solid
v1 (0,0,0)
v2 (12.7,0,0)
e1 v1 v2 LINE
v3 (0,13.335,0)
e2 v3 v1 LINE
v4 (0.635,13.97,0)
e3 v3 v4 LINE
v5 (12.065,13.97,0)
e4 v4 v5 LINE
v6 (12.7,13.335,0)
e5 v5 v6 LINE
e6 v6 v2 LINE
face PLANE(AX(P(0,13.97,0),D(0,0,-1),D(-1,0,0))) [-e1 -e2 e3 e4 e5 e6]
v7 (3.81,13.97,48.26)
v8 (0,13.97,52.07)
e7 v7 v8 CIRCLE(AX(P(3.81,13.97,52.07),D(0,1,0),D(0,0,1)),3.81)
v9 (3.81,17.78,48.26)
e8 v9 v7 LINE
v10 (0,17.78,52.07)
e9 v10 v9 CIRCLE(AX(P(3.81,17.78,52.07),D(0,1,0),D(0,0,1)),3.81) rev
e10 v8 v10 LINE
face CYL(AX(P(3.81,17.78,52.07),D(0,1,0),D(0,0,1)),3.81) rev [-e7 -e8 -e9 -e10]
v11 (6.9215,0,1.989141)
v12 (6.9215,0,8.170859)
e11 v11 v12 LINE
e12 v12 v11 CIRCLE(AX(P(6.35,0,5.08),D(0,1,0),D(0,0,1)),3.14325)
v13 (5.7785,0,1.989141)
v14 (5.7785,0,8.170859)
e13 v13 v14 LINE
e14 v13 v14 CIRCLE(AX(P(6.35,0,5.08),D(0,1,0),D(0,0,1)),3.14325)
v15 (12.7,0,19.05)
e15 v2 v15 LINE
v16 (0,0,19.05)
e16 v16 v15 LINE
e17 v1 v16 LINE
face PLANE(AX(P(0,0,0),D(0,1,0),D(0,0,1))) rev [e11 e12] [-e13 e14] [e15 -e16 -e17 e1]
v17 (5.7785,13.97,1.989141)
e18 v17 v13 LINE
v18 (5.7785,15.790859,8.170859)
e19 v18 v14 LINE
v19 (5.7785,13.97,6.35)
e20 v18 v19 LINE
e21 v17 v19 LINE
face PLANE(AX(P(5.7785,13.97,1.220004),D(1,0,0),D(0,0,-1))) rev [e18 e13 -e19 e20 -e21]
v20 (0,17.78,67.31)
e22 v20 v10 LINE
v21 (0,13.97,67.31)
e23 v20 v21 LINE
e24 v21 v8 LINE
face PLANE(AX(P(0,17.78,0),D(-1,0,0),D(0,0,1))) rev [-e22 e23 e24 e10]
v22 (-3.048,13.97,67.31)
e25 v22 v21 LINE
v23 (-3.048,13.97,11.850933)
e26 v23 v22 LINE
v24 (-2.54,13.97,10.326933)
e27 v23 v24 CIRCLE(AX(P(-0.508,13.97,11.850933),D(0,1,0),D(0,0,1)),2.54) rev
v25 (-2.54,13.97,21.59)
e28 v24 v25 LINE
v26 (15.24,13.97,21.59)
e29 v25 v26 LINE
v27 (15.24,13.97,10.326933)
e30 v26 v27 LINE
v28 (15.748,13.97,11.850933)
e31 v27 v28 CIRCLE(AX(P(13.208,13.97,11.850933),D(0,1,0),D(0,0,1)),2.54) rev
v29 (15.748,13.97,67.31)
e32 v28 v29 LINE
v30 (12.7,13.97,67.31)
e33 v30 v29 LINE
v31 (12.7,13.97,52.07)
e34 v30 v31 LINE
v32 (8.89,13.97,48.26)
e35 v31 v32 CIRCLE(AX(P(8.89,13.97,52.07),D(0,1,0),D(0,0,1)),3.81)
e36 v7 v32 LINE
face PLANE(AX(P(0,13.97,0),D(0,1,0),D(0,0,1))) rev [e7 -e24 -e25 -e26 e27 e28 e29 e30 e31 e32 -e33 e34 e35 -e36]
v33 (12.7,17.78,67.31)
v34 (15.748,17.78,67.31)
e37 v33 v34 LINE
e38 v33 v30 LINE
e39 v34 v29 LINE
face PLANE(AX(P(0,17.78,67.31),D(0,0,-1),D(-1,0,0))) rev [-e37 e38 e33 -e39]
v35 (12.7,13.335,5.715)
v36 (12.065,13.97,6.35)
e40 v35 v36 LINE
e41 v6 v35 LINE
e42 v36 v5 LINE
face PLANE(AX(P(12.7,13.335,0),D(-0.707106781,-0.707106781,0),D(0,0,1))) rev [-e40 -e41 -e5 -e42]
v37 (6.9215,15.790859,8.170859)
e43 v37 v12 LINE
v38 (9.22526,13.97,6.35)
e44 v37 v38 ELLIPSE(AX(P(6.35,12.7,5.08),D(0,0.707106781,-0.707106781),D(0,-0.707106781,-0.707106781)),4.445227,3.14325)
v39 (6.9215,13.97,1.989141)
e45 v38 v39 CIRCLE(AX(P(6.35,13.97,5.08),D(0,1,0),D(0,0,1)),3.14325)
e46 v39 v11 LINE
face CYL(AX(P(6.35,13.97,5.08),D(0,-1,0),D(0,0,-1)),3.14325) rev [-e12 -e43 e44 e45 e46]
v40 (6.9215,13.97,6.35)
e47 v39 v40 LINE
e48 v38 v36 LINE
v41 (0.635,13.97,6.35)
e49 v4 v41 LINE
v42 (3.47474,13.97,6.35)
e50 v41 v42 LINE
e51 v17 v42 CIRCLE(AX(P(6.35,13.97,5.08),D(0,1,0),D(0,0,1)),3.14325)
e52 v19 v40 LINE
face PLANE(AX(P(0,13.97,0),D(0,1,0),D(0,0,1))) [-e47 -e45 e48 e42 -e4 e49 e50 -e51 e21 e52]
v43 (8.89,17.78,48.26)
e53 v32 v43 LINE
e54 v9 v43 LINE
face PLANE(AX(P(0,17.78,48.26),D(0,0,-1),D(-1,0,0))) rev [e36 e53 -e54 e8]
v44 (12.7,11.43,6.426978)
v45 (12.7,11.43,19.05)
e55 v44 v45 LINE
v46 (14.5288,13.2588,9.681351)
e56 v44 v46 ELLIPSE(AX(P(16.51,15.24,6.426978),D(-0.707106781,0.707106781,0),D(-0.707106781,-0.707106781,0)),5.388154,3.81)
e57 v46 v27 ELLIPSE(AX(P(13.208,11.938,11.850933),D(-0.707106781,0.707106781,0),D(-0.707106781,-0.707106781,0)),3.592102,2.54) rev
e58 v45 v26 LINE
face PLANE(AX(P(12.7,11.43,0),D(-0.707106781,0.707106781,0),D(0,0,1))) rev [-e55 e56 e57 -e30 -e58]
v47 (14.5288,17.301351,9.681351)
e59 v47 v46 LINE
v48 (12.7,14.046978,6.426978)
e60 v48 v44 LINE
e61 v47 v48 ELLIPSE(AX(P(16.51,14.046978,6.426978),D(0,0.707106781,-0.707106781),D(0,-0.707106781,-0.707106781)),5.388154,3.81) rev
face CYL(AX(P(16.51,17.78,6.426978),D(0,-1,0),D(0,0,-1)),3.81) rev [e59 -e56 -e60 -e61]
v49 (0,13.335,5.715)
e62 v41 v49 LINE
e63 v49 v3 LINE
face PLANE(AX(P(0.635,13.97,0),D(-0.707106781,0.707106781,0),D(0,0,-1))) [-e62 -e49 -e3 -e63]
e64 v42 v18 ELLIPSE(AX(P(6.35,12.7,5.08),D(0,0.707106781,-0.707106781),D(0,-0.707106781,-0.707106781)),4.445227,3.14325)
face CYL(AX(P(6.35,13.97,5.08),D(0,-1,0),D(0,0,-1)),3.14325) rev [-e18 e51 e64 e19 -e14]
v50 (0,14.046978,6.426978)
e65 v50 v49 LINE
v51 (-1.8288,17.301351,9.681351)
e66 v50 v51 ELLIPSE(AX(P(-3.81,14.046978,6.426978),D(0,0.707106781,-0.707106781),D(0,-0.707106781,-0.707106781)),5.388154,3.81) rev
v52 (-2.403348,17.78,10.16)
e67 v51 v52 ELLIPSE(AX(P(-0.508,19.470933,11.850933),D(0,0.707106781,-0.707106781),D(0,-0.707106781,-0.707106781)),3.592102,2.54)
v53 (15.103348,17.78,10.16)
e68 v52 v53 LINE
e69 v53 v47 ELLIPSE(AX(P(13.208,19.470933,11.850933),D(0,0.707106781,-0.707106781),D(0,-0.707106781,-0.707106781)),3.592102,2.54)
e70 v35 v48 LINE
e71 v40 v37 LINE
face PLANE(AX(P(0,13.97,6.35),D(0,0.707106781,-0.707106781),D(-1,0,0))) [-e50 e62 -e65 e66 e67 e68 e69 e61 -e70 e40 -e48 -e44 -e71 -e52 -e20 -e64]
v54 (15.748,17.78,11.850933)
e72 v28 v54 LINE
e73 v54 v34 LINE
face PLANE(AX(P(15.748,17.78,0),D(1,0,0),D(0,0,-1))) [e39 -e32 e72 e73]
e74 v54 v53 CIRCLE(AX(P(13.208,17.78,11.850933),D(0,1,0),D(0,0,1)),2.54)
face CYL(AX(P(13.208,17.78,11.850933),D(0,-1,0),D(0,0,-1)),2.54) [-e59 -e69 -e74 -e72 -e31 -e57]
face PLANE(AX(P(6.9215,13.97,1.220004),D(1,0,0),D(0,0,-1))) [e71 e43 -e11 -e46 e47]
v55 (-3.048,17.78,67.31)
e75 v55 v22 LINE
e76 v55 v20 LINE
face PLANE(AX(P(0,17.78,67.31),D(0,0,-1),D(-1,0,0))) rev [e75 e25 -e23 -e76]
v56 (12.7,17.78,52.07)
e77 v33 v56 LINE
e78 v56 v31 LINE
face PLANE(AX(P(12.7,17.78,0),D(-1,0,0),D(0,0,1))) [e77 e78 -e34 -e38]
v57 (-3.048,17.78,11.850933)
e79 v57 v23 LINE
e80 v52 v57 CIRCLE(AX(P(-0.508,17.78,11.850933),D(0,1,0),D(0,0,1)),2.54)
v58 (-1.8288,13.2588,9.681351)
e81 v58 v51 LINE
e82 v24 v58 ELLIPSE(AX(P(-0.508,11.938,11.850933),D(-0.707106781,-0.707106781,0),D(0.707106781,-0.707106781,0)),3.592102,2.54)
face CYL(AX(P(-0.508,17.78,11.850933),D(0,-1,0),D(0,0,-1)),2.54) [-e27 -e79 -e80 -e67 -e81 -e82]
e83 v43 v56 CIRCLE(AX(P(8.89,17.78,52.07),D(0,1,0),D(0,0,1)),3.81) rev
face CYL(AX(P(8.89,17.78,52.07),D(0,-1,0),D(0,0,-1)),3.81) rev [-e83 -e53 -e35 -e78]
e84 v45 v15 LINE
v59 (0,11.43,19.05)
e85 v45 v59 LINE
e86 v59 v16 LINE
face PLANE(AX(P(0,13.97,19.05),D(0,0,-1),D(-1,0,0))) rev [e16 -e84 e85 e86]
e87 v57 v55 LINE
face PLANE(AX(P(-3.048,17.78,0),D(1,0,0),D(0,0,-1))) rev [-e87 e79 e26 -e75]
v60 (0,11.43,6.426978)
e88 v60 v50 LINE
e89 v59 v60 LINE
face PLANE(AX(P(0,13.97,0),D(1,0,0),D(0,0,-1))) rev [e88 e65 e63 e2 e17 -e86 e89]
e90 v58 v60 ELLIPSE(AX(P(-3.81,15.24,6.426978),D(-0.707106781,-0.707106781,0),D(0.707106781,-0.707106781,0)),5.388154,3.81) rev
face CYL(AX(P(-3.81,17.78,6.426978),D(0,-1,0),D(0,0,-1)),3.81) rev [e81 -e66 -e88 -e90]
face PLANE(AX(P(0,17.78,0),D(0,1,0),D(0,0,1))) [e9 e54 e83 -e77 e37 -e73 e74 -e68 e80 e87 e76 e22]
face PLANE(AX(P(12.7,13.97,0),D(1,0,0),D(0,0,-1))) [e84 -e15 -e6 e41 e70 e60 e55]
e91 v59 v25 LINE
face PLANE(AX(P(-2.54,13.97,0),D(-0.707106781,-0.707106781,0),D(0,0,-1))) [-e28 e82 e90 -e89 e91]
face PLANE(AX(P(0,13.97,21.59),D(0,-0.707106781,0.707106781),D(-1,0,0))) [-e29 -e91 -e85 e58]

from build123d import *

# Parameters (mm, degrees)
SKETCH1_W           = 12.7
SKETCH1_H           = 19.05
BOSS_EXTRUDE1_DEPTH = 13.97
SKETCH2_W           = 12.7
SKETCH2_H           = 8.89
BOSS_EXTRUDE2_DEPTH = 3.81
CHAMFER3_SIZE       = 3.81
CHAMFER5_SIZE       = 2.54
FILLET1_R           = 3.81
FILLET2_R           = 3.81
FILLET3_R           = 2.54
CHAMFER6_SIZE       = 0.635


with BuildPart() as part:
    # Sketch1 → Boss-Extrude1 (new body)
    with BuildSketch(Plane(origin=(0, 0, 0), x_dir=(1, 0, 0), z_dir=(0, 1, 0))):
        with Locations((6.35, -9.525)):
            Rectangle(SKETCH1_W, SKETCH1_H)
        with BuildLine():
            Line((5.7785, -1.989141169), (5.7785, -8.170858831))
            ThreePointArc((5.7785, -8.170858831), (3.20675, -5.08), (5.7785, -1.989141169))
        make_face(mode=Mode.SUBTRACT)
        with BuildLine():
            ThreePointArc((6.9215, -1.989141169), (9.49325, -5.08), (6.9215, -8.170858831))
            Line((6.9215, -8.170858831), (6.9215, -1.989141169))
        make_face(mode=Mode.SUBTRACT)
    extrude(amount=BOSS_EXTRUDE1_DEPTH)

    # Sketch2 → Boss-Extrude2 (add)
    with BuildSketch(Plane(origin=(0, 13.97, 0), x_dir=(1, 0, 0), z_dir=(0, 1, 0))):
        Polygon((0, -10.16), (-3.048, -10.16), (-3.048, -67.31), (0, -67.31), (0, -48.26), (12.7, -48.26), (12.7, -67.31), (15.748, -67.31), (15.748, -10.16), (12.7, -10.16), (12.7, -19.05), (0, -19.05), align=None)
        with Locations((6.35, -14.605)):
            Rectangle(SKETCH2_W, SKETCH2_H)
    extrude(amount=BOSS_EXTRUDE2_DEPTH)

    # Chamfer3
    # the kernel refuses this chamfer: 3.81 mm, written as the material it adds along each edge
    with BuildSketch(Plane(origin=(12.7, 13.97, 10.16), x_dir=(0, -0.027495876610586382, -0.9996219169112968), z_dir=(-1, 0, 0))) as chamfer3_piece_1_section:
        Polygon((CHAMFER3_SIZE * 0.999621916911, -CHAMFER3_SIZE * 0.0274958766106), (-CHAMFER3_SIZE * 0.0274958766106, -CHAMFER3_SIZE * 0.999621916911), (0, 0), align=None)
    chamfer3_piece_1 = extrude(amount=12.7, mode=Mode.PRIVATE)
    chamfer3_piece_1 = chamfer3_piece_1 - Plane(origin=(6.35, 15.278434863, 5.08), x_dir=(-0.18181818181819312, 0, 0.9833321660356314), z_dir=(0, -1, 0)) * Cylinder(3.14325, 41, mode=Mode.PRIVATE)
    add(chamfer3_piece_1)
    with BuildSketch(Plane(origin=(22.498112184, 13.97, 10.16), x_dir=(0, -0.027495876610586382, -0.9996219169112968), z_dir=(-1, 0, 0))) as chamfer3_piece_2_section:
        Polygon((CHAMFER3_SIZE * 0.999621916911, -CHAMFER3_SIZE * 0.0274958766106), (-CHAMFER3_SIZE * 0.0274958766106, -CHAMFER3_SIZE * 0.999621916911), (0, 0), align=None)
    chamfer3_piece_2 = extrude(amount=32.296224368, mode=Mode.PRIVATE)
    chamfer3_piece_2 = split(chamfer3_piece_2, bisect_by=Plane(origin=(5.7785, 14.588702158, 7.587404322), z_dir=(1, 0, 0)), keep=Keep.TOP, mode=Mode.PRIVATE)
    chamfer3_piece_2 = split(chamfer3_piece_2, bisect_by=Plane(origin=(6.9215, 14.588702158, 7.587404322), z_dir=(-1, 0, 0)), keep=Keep.TOP, mode=Mode.PRIVATE)
    add(chamfer3_piece_2)

    # Chamfer5
    chamfer5_edges = [part.edges().sort_by_distance(p)[0] for p in [
        (6.35, 13.97, 19.05),
        (12.7, 13.97, 14.605),
        (0, 13.97, 14.605),
    ]]
    chamfer(chamfer5_edges, length=CHAMFER5_SIZE)

    # Fillet1
    fillet1_edges = [part.edges().sort_by_distance(p)[0] for p in [
        (0, 15.875, 48.26),
        (12.7, 15.875, 48.26),
    ]]
    fillet(fillet1_edges, radius=FILLET1_R)

    # Fillet2
    # the kernel refuses this fillet: 3.81 mm, written as the material it adds along each edge
    with BuildSketch(Plane(origin=(0, 2.09744408, 10.16), x_dir=(-1.0, 0, -1.5694648846796446e-12), z_dir=(0, 1, 0))) as fillet2_piece_1_section:
        with BuildLine():
            CenterArc((3.81, -3.733022368), FILLET2_R, 101.536959033, 78.463040967)
            Line((0, -3.733022368), (-0.0762, -3.733022368))
            Line((-0.0762, -3.733022368), (-0.0762, 0))
            Line((-0.0762, 0), (0, 0.0762))
            ThreePointArc((0, 0.0762), (1.524, 0.0762), (3.03276, 0.074660447))
            Line((3.03276, 0.074660447), (3.048, 0))
        make_face()
    fillet2_piece_1 = extrude(amount=15.68255592, mode=Mode.PRIVATE)
    fillet2_piece_1 = split(fillet2_piece_1, bisect_by=Plane(origin=(-0.488499052, 13.97, 9.10243743), z_dir=(0, -1, 0)), keep=Keep.TOP, mode=Mode.PRIVATE)
    fillet2_piece_1 = split(fillet2_piece_1, bisect_by=Plane(origin=(-1.001374289, 12.431374289, 9.10243743), z_dir=(0.7071067811865477, 0.7071067811865475, 0)), keep=Keep.TOP, mode=Mode.PRIVATE)
    add(fillet2_piece_1)
    with BuildSketch(Plane(origin=(0, 2.09744408, 10.16), x_dir=(-1.0, 0, -1.5694648846796446e-12), z_dir=(0, 1, 0))) as fillet2_piece_2_section:
        with BuildLine():
            CenterArc((3.81, -3.733022368), FILLET2_R, 101.536959033, 78.463040967)
            Line((0, -3.733022368), (-0.0762, -3.733022368))
            Line((-0.0762, -3.733022368), (-0.0762, 0))
            Line((-0.0762, 0), (0, 0.0762))
            ThreePointArc((0, 0.0762), (1.524, 0.0762), (3.03276, 0.074660447))
            Line((3.03276, 0.074660447), (3.048, 0))
        make_face()
    fillet2_piece_2 = extrude(amount=15.68255592, mode=Mode.PRIVATE)
    fillet2_piece_2 = split(fillet2_piece_2, bisect_by=Plane(origin=(-2.842111613, 13.97, 10.172095318), z_dir=(0, 1, 0)), keep=Keep.TOP, mode=Mode.PRIVATE)
    fillet2_piece_2 = split(fillet2_piece_2, bisect_by=Plane(origin=(-2.766583712, 14.196583712, 10.172095318), z_dir=(-0.7071067811865477, -0.7071067811865475, 0)), keep=Keep.TOP, mode=Mode.PRIVATE)
    add(fillet2_piece_2)
    with BuildSketch(Plane(origin=(0, 2.09744408, 10.16), x_dir=(-1.0, 0, -1.5694648846796446e-12), z_dir=(0, 1, 0))) as fillet2_piece_3_section:
        with BuildLine():
            CenterArc((3.81, -3.733022368), FILLET2_R, 101.536959033, 78.463040967)
            Line((0, -3.733022368), (-0.0762, -3.733022368))
            Line((-0.0762, -3.733022368), (-0.0762, 0))
            Line((-0.0762, 0), (0, 0.0762))
            ThreePointArc((0, 0.0762), (1.524, 0.0762), (3.03276, 0.074660447))
            Line((3.03276, 0.074660447), (3.048, 0))
        make_face()
    fillet2_piece_3 = extrude(amount=15.68255592, mode=Mode.PRIVATE)
    fillet2_piece_3 = split(fillet2_piece_3, bisect_by=Plane(origin=(-0.871394664, 13.97, 9.510267837), z_dir=(0, 1, 0)), keep=Keep.TOP, mode=Mode.PRIVATE)
    fillet2_piece_3 = split(fillet2_piece_3, bisect_by=Plane(origin=(-2.496213957, 13.926213957, 9.510267837), z_dir=(0.7071067811865477, 0.7071067811865475, 0)), keep=Keep.TOP, mode=Mode.PRIVATE)
    fillet2_piece_3 = split(fillet2_piece_3, bisect_by=Plane(origin=(-0.871394664, 16.340650543, 8.720650543), z_dir=(0, -0.7071067811862648, 0.7071067811868302)), keep=Keep.TOP, mode=Mode.PRIVATE)
    add(fillet2_piece_3)
    with BuildSketch(Plane(origin=(12.7, 17.78, 10.16), x_dir=(1.0, 0, -1.0525263949987076e-12), z_dir=(0, -1, 0))) as fillet2_piece_4_section:
        with BuildLine():
            CenterArc((3.81, -3.733022368), FILLET2_R, 101.536959033, 78.463040967)
            Line((0, -3.733022368), (-0.0762, -3.733022368))
            Line((-0.0762, -3.733022368), (-0.0762, 0))
            Line((-0.0762, 0), (0, 0.0762))
            ThreePointArc((0, 0.0762), (1.524, 0.0762), (3.03276, 0.074660447))
            Line((3.03276, 0.074660447), (3.048, 0))
        make_face()
    fillet2_piece_4 = extrude(amount=15.68255592, mode=Mode.PRIVATE)
    fillet2_piece_4 = split(fillet2_piece_4, bisect_by=Plane(origin=(13.571394664, 13.97, 9.510267837), z_dir=(0, 1, 0)), keep=Keep.TOP, mode=Mode.PRIVATE)
    fillet2_piece_4 = split(fillet2_piece_4, bisect_by=Plane(origin=(15.196213957, 13.926213957, 9.510267837), z_dir=(-0.7071067811865479, 0.7071067811865474, 0)), keep=Keep.TOP, mode=Mode.PRIVATE)
    fillet2_piece_4 = split(fillet2_piece_4, bisect_by=Plane(origin=(13.571394664, 16.340650543, 8.720650543), z_dir=(0, -0.7071067811862648, 0.7071067811868302)), keep=Keep.TOP, mode=Mode.PRIVATE)
    add(fillet2_piece_4)
    with BuildSketch(Plane(origin=(12.7, 17.78, 10.16), x_dir=(1.0, 0, -1.0525263949987076e-12), z_dir=(0, -1, 0))) as fillet2_piece_5_section:
        with BuildLine():
            CenterArc((3.81, -3.733022368), FILLET2_R, 101.536959033, 78.463040967)
            Line((0, -3.733022368), (-0.0762, -3.733022368))
            Line((-0.0762, -3.733022368), (-0.0762, 0))
            Line((-0.0762, 0), (0, 0.0762))
            ThreePointArc((0, 0.0762), (1.524, 0.0762), (3.03276, 0.074660447))
            Line((3.03276, 0.074660447), (3.048, 0))
        make_face()
    fillet2_piece_5 = extrude(amount=15.68255592, mode=Mode.PRIVATE)
    fillet2_piece_5 = split(fillet2_piece_5, bisect_by=Plane(origin=(13.188499052, 13.97, 9.10243743), z_dir=(0, -1, 0)), keep=Keep.TOP, mode=Mode.PRIVATE)
    fillet2_piece_5 = split(fillet2_piece_5, bisect_by=Plane(origin=(13.701374289, 12.431374289, 9.10243743), z_dir=(-0.7071067811865479, 0.7071067811865474, 0)), keep=Keep.TOP, mode=Mode.PRIVATE)
    add(fillet2_piece_5)
    with BuildSketch(Plane(origin=(12.7, 17.78, 10.16), x_dir=(1.0, 0, -1.0525263949987076e-12), z_dir=(0, -1, 0))) as fillet2_piece_6_section:
        with BuildLine():
            CenterArc((3.81, -3.733022368), FILLET2_R, 101.536959033, 78.463040967)
            Line((0, -3.733022368), (-0.0762, -3.733022368))
            Line((-0.0762, -3.733022368), (-0.0762, 0))
            Line((-0.0762, 0), (0, 0.0762))
            ThreePointArc((0, 0.0762), (1.524, 0.0762), (3.03276, 0.074660447))
            Line((3.03276, 0.074660447), (3.048, 0))
        make_face()
    fillet2_piece_6 = extrude(amount=15.68255592, mode=Mode.PRIVATE)
    fillet2_piece_6 = split(fillet2_piece_6, bisect_by=Plane(origin=(15.542111613, 13.97, 10.172095318), z_dir=(0, 1, 0)), keep=Keep.TOP, mode=Mode.PRIVATE)
    fillet2_piece_6 = split(fillet2_piece_6, bisect_by=Plane(origin=(15.466583712, 14.196583712, 10.172095318), z_dir=(0.7071067811865479, -0.7071067811865474, 0)), keep=Keep.TOP, mode=Mode.PRIVATE)
    add(fillet2_piece_6)

    # Fillet3
    fillet3_edges = [part.edges().sort_by_distance(p)[0] for p in [
        (-3.048, 15.875, 10.16),
        (15.748, 15.875, 10.16),
    ]]
    fillet(fillet3_edges, radius=FILLET3_R)

    # Chamfer6
    chamfer6_edges = [part.edges().sort_by_distance(p)[0] for p in [
        (12.7, 13.97, 3.175),
        (0, 13.97, 3.175),
    ]]
    chamfer(chamfer6_edges, length=CHAMFER6_SIZE)


solid = part.part
